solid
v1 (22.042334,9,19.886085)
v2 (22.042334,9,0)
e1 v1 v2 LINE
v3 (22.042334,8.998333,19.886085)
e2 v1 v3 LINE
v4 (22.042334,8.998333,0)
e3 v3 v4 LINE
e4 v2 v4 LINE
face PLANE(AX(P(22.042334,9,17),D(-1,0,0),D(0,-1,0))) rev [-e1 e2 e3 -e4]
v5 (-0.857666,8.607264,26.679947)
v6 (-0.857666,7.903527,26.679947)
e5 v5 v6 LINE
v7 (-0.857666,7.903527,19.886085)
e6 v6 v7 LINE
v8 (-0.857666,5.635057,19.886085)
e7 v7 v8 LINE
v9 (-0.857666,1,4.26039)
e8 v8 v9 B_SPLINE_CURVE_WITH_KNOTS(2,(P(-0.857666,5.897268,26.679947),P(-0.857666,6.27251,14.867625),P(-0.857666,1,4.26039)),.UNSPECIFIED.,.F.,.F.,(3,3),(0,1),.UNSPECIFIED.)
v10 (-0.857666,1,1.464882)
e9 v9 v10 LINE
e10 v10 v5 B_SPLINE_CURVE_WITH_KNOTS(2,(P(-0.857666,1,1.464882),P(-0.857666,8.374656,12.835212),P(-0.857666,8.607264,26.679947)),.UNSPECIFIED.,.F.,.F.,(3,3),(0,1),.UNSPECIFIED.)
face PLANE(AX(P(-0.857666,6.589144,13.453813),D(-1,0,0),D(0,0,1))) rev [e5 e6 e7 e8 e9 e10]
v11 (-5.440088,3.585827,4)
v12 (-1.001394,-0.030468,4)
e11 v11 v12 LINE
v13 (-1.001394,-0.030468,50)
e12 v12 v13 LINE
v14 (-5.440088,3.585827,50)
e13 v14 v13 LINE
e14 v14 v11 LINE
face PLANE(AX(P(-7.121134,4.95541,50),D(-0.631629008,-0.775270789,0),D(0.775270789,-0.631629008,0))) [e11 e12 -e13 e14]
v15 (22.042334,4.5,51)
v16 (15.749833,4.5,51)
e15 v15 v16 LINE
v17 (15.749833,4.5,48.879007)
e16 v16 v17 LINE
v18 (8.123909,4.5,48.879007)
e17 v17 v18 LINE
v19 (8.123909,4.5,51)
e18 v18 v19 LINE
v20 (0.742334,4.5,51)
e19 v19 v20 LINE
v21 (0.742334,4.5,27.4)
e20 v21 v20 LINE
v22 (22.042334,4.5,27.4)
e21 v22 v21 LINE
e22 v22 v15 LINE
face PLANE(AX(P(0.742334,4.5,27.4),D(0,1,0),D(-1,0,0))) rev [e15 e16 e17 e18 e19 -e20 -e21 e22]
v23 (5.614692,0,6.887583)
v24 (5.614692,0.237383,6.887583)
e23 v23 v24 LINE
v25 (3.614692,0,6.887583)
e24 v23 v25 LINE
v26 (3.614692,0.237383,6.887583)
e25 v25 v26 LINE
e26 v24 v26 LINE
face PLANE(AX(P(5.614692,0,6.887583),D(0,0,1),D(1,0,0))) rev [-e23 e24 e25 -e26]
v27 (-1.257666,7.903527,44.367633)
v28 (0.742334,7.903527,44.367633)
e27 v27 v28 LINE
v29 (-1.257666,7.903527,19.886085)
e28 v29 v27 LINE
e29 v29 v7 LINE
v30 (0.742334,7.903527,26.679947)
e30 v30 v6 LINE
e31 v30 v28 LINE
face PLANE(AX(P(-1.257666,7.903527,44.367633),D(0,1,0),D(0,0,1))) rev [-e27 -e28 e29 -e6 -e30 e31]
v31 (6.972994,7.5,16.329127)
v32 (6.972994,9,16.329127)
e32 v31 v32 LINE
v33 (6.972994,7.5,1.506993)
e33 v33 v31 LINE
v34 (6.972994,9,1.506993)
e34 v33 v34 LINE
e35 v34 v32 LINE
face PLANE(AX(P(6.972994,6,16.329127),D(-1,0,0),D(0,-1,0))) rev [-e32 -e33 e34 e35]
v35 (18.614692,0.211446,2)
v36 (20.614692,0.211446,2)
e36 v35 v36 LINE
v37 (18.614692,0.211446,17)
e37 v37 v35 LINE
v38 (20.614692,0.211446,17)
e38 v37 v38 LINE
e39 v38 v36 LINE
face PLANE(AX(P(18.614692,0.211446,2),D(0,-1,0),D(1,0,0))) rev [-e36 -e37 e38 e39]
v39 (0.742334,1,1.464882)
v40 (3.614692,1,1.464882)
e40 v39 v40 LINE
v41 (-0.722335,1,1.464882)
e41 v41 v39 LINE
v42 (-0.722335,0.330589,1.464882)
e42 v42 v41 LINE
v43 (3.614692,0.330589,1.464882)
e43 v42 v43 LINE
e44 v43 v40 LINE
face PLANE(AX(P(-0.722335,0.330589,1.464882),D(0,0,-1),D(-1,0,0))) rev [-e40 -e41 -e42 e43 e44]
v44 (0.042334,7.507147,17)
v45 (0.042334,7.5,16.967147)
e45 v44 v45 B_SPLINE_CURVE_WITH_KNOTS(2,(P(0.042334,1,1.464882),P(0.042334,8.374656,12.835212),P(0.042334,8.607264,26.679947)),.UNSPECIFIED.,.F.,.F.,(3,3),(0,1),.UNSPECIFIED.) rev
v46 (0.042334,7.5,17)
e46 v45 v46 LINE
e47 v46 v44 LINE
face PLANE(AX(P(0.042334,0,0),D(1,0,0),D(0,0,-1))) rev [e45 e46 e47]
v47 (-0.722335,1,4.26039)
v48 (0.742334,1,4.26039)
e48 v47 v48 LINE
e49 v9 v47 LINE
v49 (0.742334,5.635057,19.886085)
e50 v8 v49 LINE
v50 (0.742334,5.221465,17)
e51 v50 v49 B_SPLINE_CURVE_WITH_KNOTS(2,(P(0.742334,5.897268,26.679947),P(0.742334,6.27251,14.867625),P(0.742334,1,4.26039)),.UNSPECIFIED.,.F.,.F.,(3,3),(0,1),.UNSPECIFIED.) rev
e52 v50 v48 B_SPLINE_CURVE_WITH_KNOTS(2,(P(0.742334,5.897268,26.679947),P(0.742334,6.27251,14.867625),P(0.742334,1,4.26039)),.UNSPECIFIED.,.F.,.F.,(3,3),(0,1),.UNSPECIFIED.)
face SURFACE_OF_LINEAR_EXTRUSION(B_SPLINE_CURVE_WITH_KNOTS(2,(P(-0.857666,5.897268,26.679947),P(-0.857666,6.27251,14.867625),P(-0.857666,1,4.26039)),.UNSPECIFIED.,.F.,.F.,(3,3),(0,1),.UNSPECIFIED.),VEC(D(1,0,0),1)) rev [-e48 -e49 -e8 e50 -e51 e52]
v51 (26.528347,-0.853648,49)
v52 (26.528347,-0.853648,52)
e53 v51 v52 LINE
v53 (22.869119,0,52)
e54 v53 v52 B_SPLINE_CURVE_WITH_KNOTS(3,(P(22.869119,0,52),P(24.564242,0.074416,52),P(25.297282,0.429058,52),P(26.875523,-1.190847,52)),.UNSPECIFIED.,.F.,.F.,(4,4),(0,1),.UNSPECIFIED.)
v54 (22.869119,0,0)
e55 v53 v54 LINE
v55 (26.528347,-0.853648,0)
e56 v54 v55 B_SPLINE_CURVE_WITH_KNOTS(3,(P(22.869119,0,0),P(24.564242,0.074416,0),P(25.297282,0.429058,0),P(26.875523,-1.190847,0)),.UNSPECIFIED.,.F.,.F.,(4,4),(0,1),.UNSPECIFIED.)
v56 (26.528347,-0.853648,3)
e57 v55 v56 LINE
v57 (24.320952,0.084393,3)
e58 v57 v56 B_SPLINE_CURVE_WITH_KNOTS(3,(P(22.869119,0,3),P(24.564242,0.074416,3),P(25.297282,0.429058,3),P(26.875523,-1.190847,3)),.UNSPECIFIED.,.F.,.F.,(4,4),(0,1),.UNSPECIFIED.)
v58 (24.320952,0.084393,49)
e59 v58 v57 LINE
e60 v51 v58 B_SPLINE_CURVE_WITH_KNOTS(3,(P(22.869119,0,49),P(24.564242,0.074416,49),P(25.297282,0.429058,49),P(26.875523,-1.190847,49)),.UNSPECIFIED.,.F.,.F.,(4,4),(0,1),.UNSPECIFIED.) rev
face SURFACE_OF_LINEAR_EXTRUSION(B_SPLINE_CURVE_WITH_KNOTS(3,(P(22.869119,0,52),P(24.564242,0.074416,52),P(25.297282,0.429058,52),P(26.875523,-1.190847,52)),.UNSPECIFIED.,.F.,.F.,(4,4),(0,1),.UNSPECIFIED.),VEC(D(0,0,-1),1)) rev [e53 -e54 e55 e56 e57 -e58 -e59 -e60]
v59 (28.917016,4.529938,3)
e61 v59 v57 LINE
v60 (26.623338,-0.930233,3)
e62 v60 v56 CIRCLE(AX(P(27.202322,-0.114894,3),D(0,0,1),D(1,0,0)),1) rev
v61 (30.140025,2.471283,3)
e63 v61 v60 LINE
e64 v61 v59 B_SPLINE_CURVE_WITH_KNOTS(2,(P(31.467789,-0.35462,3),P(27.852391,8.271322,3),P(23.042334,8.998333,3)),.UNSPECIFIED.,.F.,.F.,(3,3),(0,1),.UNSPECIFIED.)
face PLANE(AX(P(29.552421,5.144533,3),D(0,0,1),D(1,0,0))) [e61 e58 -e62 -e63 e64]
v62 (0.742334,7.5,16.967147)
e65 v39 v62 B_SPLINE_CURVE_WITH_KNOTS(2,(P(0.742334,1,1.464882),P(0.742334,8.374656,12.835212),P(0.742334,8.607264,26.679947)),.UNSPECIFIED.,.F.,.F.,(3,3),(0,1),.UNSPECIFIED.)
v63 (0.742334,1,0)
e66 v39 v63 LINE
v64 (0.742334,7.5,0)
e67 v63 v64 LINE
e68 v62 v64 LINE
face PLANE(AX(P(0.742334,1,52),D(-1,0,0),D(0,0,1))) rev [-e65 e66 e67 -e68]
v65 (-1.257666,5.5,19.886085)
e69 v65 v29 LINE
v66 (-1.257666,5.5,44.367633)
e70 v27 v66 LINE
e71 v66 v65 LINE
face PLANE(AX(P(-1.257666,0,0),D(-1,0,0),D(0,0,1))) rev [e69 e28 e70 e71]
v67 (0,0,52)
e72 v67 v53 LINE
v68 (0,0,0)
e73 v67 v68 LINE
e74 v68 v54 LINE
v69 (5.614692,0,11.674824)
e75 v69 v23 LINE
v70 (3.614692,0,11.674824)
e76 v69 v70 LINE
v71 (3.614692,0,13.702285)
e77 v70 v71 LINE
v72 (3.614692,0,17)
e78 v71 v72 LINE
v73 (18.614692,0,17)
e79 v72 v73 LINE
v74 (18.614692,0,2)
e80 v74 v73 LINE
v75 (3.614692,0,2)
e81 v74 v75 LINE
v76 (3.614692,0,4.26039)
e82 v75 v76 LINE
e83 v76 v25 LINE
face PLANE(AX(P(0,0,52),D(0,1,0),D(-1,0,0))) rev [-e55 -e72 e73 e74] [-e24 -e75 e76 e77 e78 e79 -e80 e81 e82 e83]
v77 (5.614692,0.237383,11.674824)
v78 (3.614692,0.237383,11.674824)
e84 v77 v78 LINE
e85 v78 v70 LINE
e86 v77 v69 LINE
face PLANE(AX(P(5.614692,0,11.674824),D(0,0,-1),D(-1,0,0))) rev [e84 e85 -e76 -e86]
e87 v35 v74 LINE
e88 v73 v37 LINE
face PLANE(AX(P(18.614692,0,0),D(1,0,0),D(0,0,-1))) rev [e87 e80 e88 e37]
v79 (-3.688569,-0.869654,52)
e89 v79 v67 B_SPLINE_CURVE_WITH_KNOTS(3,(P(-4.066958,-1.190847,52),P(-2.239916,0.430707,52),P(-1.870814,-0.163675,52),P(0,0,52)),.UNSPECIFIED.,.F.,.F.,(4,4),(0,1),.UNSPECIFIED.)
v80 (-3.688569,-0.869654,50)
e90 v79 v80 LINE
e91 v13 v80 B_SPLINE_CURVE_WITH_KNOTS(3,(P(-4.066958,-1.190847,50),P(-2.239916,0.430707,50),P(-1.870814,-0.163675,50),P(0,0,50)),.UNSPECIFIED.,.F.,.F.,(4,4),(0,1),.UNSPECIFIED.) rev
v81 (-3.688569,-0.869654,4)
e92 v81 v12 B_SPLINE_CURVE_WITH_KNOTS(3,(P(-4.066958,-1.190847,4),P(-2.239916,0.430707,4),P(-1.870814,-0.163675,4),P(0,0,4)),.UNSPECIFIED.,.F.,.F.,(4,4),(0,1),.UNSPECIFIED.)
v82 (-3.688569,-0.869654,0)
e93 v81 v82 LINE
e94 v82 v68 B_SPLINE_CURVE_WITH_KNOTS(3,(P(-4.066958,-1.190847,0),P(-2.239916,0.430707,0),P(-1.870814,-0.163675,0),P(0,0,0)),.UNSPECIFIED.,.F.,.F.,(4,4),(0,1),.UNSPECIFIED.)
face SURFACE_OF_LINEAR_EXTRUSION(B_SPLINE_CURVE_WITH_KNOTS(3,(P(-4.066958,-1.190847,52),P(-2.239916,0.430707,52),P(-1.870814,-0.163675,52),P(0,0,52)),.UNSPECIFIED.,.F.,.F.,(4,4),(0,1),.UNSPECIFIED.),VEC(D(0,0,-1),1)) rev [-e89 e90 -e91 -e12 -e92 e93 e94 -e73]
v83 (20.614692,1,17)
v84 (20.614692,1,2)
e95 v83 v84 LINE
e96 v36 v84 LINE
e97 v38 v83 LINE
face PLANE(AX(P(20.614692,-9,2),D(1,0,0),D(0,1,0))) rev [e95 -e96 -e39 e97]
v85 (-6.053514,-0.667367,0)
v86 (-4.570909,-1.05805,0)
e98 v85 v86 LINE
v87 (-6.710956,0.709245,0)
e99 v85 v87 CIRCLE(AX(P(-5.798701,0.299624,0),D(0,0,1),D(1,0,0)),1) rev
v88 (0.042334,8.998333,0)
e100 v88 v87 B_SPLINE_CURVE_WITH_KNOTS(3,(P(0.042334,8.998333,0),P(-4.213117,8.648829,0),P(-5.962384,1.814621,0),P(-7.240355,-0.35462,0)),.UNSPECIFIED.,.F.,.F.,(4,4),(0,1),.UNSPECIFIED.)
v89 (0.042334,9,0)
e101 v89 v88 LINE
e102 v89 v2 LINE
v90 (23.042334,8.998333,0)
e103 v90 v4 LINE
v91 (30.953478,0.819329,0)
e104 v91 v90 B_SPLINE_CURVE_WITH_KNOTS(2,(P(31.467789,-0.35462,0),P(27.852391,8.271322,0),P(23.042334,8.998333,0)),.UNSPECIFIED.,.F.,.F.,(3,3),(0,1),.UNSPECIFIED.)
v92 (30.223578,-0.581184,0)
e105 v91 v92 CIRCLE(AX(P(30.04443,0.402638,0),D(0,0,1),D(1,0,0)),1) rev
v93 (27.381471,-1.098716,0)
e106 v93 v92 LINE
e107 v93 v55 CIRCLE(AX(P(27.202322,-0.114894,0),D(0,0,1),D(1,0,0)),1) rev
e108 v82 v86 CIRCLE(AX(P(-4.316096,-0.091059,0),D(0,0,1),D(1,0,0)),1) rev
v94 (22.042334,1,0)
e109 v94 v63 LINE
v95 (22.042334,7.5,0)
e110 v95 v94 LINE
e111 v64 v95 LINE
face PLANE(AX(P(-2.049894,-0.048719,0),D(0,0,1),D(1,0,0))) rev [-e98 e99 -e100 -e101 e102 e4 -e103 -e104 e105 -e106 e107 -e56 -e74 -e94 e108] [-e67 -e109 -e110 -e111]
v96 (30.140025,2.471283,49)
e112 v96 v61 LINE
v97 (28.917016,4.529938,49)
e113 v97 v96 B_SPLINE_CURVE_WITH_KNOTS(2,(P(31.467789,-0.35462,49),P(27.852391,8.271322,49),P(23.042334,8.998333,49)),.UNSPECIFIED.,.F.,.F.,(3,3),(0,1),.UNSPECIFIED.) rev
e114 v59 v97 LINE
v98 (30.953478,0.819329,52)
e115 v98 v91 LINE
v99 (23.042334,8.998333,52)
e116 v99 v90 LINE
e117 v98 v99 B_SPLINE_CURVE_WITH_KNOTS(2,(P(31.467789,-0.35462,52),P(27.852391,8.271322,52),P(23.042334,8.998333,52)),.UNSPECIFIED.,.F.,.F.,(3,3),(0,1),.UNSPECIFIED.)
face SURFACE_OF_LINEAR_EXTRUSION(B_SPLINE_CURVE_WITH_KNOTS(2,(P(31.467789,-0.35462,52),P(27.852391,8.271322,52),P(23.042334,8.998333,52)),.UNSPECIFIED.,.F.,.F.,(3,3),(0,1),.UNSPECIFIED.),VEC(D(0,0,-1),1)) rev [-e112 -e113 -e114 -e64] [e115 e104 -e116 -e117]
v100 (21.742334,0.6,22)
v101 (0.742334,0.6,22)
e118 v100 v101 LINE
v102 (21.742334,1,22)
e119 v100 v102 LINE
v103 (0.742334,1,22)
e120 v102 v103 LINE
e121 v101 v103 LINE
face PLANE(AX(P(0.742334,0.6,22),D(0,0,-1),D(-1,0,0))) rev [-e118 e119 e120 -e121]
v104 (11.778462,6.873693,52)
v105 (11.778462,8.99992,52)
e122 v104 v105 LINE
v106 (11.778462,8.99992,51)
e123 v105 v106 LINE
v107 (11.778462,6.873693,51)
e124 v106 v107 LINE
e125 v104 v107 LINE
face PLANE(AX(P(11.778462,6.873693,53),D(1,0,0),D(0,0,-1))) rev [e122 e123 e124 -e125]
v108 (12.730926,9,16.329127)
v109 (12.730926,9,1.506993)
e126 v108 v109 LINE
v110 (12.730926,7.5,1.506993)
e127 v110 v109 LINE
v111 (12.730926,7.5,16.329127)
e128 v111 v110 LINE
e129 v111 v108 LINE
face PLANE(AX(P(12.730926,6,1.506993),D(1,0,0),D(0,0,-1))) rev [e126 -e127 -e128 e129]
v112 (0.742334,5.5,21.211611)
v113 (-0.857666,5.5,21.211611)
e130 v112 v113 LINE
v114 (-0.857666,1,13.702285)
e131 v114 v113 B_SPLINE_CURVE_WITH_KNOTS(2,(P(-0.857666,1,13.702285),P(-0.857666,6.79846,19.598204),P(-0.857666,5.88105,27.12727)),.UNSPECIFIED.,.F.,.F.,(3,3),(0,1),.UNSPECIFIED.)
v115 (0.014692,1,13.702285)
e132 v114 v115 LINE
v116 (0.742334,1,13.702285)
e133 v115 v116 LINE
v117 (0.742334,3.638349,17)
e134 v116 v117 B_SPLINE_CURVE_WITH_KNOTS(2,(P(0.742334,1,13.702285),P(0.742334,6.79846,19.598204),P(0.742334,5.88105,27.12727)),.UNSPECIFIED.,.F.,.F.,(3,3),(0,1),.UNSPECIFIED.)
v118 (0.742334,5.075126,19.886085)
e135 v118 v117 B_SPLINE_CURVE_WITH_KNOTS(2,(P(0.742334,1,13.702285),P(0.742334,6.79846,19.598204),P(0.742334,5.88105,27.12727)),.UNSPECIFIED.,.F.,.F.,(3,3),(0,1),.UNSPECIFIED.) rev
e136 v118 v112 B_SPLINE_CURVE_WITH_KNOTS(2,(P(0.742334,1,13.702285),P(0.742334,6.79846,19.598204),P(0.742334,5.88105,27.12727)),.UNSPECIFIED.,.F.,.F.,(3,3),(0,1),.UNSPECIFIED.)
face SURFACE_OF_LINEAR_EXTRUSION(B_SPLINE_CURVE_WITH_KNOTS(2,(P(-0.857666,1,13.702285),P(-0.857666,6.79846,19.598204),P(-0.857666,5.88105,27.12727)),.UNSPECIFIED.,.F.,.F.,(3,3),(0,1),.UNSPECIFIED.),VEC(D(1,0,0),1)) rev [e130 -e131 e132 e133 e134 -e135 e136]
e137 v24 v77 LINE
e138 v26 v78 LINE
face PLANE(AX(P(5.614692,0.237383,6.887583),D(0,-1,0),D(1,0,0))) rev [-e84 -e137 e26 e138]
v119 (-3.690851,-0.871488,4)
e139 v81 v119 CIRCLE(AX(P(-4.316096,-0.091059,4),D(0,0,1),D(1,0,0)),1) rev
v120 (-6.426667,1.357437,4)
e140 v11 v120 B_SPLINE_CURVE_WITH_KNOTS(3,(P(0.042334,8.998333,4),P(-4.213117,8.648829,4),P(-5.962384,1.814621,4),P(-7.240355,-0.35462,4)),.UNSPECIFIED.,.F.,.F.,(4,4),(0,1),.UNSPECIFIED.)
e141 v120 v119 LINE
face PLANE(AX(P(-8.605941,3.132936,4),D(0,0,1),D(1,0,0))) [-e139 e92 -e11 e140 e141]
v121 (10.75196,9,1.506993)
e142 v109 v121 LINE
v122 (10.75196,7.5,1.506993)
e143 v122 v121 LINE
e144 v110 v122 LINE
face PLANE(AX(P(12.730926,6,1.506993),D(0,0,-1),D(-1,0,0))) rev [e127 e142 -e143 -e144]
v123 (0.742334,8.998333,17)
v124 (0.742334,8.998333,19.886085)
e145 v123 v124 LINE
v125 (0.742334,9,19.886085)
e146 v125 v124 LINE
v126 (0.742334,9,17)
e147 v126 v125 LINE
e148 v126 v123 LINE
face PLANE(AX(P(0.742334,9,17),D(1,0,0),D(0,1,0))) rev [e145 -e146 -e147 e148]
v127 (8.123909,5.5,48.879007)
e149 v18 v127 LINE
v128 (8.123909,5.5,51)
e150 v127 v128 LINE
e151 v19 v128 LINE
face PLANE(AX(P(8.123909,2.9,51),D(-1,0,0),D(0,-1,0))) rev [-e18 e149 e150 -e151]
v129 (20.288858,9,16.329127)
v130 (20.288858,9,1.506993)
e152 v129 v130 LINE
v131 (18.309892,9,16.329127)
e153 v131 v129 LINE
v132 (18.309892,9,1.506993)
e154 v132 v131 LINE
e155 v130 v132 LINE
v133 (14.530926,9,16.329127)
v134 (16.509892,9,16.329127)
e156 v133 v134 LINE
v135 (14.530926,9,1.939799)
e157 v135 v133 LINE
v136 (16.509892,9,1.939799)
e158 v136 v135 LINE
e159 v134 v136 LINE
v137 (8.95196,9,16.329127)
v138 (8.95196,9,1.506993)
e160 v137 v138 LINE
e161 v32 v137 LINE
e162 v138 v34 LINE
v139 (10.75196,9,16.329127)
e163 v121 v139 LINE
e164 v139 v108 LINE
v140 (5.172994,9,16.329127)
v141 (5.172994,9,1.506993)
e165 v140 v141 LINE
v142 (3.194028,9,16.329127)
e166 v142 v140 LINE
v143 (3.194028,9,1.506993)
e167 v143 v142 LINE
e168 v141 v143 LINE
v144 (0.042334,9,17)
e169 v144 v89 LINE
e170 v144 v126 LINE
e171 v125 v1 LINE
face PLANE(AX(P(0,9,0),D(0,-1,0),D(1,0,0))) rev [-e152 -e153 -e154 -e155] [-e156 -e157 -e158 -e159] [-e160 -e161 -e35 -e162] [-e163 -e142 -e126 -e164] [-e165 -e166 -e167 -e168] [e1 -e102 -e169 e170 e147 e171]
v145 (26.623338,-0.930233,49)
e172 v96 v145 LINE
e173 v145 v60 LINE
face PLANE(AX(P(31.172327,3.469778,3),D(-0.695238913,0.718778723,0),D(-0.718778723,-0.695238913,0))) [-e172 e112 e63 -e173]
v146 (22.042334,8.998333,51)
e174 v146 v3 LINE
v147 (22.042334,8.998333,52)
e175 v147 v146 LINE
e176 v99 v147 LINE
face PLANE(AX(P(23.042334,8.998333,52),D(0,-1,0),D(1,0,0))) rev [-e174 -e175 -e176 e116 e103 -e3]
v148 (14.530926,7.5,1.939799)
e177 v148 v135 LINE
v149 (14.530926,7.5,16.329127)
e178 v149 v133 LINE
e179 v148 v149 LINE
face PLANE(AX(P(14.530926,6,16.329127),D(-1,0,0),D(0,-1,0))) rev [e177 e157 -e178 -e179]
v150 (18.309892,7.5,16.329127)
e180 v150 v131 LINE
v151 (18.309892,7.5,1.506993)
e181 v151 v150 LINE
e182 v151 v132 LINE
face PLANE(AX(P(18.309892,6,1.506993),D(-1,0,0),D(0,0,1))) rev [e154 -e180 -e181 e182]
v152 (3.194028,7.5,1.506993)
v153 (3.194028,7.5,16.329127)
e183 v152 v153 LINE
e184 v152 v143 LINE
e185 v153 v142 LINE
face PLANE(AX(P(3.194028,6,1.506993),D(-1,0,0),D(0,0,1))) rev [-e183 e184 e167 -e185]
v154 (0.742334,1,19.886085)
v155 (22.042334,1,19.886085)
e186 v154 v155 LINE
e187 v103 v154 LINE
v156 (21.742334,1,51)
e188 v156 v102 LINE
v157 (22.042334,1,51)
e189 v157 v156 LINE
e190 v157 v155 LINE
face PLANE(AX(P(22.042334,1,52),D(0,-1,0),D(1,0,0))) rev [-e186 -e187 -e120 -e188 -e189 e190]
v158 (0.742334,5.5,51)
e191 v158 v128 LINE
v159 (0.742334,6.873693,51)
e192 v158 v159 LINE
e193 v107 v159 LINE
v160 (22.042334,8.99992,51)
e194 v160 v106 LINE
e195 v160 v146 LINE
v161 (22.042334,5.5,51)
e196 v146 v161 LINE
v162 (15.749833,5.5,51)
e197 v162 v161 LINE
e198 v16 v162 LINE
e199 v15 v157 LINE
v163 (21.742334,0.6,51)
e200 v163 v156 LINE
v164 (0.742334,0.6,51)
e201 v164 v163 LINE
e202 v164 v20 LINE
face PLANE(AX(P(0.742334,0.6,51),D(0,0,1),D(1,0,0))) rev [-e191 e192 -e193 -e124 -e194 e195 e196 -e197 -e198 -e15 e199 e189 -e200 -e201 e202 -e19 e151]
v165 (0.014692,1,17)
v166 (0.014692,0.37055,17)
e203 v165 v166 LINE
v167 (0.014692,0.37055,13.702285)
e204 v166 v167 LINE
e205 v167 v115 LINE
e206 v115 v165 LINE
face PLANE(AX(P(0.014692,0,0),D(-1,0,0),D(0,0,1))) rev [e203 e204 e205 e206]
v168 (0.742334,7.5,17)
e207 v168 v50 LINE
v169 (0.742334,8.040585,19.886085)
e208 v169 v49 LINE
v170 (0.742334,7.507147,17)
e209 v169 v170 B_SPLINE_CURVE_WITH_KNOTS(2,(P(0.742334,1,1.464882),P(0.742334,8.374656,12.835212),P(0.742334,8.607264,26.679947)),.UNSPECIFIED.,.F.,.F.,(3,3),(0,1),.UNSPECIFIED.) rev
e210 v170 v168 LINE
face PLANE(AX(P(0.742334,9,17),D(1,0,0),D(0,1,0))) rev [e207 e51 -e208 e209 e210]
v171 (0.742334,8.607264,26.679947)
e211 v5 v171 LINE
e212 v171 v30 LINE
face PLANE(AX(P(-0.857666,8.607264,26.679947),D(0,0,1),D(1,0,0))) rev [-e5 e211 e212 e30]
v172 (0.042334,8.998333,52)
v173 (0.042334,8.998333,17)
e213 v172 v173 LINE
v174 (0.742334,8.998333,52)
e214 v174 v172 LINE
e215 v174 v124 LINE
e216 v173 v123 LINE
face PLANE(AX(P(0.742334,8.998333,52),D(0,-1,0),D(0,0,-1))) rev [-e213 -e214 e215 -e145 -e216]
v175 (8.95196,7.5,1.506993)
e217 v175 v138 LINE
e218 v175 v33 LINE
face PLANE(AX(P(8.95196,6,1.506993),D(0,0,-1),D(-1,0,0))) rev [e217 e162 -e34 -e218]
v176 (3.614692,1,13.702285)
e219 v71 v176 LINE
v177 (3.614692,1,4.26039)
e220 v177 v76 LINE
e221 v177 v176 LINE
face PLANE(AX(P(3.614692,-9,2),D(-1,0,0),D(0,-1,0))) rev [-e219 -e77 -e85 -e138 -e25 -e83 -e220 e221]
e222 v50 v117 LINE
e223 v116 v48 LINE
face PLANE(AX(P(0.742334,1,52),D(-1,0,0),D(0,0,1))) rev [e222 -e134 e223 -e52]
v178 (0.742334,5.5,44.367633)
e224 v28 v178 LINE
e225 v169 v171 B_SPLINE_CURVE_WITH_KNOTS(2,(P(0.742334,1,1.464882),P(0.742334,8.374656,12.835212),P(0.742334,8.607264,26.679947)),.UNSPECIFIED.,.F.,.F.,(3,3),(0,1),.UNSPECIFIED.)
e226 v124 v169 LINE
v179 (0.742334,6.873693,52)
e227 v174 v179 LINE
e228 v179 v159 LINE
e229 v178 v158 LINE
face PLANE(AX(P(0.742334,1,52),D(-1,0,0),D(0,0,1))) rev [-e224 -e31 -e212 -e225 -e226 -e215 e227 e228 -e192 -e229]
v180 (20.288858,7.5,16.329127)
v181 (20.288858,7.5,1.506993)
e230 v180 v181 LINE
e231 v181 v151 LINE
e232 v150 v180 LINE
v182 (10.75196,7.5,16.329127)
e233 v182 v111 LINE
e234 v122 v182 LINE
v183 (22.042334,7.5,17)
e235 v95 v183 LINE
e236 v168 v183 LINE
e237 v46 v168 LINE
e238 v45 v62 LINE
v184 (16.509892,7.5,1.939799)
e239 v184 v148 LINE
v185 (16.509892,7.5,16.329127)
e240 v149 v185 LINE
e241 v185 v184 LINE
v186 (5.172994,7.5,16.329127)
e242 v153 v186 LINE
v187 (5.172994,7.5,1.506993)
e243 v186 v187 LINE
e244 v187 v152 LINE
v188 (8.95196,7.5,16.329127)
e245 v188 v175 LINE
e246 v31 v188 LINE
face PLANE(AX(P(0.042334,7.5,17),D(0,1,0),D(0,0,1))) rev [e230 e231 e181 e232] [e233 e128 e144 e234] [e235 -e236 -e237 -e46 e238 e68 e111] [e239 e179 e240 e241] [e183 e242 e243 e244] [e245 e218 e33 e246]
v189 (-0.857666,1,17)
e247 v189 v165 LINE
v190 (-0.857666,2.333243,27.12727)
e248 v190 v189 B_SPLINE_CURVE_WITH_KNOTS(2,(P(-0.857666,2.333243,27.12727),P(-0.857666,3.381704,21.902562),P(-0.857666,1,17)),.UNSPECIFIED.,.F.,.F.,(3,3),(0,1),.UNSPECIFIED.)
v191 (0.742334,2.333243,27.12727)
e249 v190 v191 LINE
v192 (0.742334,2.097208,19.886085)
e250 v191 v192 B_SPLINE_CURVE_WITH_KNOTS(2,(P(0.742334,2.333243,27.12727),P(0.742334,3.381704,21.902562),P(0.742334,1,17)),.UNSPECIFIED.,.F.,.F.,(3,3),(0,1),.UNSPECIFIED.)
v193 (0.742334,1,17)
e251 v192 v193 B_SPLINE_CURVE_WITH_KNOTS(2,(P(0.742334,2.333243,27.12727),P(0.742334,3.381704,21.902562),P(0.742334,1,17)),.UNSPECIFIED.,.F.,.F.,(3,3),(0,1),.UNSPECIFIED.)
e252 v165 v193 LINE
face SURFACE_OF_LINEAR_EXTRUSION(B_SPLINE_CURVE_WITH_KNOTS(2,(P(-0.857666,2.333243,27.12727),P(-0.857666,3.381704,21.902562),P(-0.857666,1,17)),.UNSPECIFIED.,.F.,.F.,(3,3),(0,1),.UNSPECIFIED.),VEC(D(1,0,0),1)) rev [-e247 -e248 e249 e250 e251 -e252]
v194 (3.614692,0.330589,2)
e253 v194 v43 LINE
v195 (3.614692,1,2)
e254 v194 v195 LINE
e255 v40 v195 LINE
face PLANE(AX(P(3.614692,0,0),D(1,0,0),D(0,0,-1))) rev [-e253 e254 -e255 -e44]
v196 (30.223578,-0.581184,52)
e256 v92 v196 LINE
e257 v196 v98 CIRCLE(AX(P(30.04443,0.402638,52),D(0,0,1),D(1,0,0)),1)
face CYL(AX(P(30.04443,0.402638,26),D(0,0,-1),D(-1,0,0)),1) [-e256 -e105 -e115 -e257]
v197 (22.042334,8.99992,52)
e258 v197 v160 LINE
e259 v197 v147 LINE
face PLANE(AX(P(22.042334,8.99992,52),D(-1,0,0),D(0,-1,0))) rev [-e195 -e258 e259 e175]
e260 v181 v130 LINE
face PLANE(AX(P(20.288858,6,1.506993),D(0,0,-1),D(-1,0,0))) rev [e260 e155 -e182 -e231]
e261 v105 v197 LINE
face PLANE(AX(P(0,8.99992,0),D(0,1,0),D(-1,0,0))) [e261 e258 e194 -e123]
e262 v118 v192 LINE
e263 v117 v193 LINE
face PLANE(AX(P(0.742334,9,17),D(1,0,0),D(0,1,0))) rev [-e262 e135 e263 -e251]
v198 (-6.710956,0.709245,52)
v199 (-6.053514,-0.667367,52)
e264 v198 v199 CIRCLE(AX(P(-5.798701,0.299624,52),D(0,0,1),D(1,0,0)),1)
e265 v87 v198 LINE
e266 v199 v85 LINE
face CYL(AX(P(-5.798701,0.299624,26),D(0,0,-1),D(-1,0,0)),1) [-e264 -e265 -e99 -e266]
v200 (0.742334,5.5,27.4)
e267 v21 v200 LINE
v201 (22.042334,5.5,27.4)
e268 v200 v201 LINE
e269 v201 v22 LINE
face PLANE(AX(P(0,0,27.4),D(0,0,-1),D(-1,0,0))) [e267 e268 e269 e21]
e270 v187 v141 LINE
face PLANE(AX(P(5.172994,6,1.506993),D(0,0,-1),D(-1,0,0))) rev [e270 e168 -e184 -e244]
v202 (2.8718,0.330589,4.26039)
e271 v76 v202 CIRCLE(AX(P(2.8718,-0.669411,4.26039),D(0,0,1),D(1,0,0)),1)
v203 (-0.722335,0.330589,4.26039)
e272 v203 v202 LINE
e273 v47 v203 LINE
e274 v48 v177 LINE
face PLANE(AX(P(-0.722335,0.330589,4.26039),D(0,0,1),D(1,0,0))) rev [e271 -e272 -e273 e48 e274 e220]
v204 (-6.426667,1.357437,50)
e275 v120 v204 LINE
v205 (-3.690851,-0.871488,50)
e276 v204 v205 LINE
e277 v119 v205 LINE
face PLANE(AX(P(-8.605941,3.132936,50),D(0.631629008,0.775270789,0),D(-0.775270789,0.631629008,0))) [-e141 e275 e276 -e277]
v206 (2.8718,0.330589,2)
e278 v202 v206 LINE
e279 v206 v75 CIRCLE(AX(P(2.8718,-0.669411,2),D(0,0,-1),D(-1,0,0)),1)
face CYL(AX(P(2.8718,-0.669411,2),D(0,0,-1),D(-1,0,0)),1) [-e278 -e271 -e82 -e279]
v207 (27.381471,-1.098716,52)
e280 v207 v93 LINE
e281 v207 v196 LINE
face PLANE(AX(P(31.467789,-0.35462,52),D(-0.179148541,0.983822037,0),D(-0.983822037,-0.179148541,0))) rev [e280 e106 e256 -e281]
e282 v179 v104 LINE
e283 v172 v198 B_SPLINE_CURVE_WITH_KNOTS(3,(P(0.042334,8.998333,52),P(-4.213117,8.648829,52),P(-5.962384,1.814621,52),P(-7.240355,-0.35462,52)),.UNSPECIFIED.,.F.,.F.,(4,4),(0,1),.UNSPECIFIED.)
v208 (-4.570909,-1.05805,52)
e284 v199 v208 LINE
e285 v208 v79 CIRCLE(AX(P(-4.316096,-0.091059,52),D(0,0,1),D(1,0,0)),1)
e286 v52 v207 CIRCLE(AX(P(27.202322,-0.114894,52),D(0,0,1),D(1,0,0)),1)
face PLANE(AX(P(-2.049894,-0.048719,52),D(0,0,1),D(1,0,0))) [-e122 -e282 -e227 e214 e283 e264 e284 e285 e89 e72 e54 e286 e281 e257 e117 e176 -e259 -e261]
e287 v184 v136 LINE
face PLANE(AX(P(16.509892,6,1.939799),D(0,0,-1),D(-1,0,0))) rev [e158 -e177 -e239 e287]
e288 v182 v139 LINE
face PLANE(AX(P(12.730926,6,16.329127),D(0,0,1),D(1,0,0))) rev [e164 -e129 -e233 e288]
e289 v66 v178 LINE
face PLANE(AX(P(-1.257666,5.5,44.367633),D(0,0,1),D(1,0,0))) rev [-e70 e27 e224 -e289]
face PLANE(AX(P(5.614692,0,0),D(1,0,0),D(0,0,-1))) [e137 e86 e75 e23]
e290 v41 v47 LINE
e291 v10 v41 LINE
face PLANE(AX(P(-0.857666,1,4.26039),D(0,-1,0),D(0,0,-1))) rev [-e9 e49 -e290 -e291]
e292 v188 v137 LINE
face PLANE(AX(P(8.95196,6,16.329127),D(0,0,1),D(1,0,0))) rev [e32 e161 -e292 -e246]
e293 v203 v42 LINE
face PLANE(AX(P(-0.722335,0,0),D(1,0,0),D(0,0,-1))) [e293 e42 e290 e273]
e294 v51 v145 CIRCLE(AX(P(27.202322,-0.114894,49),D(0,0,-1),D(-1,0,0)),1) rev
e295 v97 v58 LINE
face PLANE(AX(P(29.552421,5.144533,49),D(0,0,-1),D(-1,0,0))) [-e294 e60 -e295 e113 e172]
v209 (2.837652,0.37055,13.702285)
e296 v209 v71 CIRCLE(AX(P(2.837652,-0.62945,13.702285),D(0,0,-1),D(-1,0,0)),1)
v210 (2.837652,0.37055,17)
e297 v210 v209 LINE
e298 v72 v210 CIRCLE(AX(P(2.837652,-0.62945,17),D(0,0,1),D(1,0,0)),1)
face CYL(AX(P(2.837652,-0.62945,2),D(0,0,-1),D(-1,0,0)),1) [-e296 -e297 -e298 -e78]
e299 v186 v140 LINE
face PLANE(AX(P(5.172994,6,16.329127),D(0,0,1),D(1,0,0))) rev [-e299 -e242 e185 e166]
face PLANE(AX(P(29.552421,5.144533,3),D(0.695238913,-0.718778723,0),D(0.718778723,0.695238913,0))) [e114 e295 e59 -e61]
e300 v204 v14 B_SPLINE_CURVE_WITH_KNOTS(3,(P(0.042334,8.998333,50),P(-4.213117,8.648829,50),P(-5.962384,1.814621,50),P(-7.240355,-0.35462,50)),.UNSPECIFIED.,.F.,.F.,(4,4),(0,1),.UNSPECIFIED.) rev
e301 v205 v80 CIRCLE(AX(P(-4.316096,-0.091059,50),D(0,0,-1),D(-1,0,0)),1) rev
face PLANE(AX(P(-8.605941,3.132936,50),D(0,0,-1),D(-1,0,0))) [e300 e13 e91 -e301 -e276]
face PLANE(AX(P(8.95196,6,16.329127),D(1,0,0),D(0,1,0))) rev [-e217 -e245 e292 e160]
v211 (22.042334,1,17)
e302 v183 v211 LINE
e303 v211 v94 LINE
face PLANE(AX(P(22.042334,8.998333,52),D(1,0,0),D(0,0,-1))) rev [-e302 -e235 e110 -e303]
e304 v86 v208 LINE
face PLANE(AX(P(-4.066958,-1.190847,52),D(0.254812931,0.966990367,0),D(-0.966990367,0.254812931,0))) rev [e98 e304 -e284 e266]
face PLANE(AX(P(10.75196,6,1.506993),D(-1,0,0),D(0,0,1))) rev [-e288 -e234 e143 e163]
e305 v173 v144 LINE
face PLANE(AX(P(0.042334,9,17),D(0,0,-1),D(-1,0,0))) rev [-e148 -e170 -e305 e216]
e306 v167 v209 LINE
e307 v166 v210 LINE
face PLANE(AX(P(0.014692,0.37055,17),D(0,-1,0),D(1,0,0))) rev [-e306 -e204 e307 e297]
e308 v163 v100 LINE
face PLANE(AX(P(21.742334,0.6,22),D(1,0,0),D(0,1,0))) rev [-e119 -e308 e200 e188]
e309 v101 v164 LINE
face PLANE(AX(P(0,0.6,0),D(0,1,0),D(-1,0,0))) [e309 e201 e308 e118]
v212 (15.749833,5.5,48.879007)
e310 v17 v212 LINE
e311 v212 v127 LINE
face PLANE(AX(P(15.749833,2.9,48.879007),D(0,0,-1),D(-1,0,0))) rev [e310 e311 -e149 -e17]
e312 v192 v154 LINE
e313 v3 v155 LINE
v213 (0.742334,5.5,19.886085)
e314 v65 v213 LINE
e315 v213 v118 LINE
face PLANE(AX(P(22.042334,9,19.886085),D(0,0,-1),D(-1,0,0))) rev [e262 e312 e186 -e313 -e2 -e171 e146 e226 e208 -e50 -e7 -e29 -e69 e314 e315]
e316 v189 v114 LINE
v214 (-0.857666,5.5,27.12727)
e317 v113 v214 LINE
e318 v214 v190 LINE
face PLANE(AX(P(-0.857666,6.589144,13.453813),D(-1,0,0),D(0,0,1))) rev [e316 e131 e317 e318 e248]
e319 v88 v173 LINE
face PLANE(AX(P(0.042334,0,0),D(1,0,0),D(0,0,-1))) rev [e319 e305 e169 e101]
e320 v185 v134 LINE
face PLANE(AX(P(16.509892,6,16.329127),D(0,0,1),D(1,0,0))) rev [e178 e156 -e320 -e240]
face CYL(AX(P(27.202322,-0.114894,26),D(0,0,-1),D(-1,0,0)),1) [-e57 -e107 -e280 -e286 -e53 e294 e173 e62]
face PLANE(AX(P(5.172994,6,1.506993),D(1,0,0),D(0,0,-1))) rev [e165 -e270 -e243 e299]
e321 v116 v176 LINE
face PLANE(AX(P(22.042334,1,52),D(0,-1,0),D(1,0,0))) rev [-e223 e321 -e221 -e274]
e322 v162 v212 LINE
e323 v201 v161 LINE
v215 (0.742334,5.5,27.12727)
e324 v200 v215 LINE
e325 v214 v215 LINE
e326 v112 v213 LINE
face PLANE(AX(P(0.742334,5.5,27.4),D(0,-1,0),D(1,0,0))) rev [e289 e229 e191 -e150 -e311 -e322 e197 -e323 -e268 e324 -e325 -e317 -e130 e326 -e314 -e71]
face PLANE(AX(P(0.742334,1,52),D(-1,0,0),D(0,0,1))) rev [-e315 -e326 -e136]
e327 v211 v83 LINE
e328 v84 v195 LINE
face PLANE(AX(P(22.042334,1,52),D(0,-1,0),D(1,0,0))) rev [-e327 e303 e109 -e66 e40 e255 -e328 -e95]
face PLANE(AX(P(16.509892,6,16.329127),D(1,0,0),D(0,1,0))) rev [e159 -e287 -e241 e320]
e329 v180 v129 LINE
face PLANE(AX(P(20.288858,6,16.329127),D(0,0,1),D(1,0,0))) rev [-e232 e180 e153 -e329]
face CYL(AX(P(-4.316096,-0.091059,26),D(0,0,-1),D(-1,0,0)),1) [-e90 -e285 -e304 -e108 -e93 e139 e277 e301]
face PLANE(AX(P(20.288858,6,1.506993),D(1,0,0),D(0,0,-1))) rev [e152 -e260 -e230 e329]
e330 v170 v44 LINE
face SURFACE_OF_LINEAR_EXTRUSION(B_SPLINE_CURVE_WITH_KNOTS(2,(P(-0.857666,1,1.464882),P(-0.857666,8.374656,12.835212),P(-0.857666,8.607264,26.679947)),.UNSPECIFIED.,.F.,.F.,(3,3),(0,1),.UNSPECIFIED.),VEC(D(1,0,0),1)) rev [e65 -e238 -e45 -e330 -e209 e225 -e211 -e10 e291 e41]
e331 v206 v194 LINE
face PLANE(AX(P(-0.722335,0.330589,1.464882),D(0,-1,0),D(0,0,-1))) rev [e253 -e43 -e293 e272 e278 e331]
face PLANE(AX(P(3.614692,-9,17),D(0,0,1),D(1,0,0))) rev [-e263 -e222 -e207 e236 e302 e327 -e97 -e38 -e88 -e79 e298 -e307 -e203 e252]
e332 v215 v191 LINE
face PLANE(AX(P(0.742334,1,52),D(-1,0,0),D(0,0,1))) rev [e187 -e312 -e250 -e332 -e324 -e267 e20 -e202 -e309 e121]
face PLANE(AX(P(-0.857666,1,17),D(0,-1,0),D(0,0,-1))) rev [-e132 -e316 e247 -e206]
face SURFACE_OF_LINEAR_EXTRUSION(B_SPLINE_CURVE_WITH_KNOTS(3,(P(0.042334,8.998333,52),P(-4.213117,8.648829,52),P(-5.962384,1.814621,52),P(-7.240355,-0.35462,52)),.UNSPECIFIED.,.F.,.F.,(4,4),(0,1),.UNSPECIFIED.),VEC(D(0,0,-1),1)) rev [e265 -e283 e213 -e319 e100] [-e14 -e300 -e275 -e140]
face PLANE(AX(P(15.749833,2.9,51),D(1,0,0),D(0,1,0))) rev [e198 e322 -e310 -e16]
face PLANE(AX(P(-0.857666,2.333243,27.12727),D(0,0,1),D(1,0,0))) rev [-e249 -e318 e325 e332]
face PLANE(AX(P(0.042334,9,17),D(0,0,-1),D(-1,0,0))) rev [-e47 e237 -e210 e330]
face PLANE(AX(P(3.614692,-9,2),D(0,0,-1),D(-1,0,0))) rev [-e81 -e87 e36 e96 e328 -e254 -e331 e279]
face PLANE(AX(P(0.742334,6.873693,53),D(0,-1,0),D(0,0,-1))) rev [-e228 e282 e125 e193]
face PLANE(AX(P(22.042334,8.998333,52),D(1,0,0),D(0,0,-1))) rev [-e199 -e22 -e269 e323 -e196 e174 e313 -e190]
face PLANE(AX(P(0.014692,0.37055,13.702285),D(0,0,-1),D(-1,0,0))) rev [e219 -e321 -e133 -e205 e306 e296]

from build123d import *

# Parameters (mm, degrees)
BOSS_EXTRUDE2_DEPTH      = 52
FILLET2_R                = 1
CUT_EXTRUDE2_DEPTH       = 3
CUT_EXTRUDE2_DEPTH_BACK  = 6
SKETCH10_W               = 2.350757351
SKETCH10_H               = 46
SKETCH11_W               = 17
SKETCH11_H               = 15
PELTIER_DEPTH            = 10
SKETCH12_W               = 21
SKETCH12_H               = 29
BATTERY_DEPTH            = 0.4
SKETCH14_W               = 21.3
SKETCH14_H               = 1
BOSS_EXTRUDE4_DEPTH      = 7.999920354
SKETCH15_W               = 3.297714658
SKETCH15_H               = 0.629450307
CUT_EXTRUDE5_DEPTH       = 3.6
SKETCH16_W               = 2.795507754
SKETCH16_H               = 0.669410668
CUT_EXTRUDE6_DEPTH       = 4.337027413
FILLET3_R                = 1
CUT_EXTRUDE7_DEPTH       = 1.6
CUT_EXTRUDE8_DEPTH       = 1.6
FILLET4_R                = 1
FILLET5_R                = 1
SKETCH19_W               = 21.3
SKETCH19_H               = 1
BOSS_EXTRUDE5_DEPTH      = 23.6
SKETCH20_W               = 7.625924169
SKETCH20_H               = 2.120993271
CUT_EXTRUDE9_DEPTH       = 2.6
SKETCH21_W               = 21.3
SKETCH21_H               = 2.886084762
BOSS_EXTRUDE6_DEPTH      = 8
SKETCH22_W               = 17
SKETCH22_H               = 1.5
BOSS_EXTRUDE7_DEPTH      = 22
SKETCH23_W               = 24.481547991
SKETCH23_H               = 2.403526745
CUT_EXTRUDE10_DEPTH      = 2
SKETCH24_W               = 15
SKETCH24_H               = 0.211445756
BOSS_EXTRUDE8_DEPTH      = 2
SKETCH25_W               = 4.787241237
SKETCH25_H               = 0.237383131
BOSS_EXTRUDE9_DEPTH      = 2
SKETCH26_W               = 11.036128308
SKETCH26_H               = 2.126226966
CUT_EXTRUDE11_DEPTH      = 2
CUT_EXTRUDE12_DEPTH      = 2
CUT_EXTRUDE12_DEPTH_BACK = 11
SKETCH27_W               = 46
SKETCH27_H               = 2.33
SKETCH28_W               = 1.978966
SKETCH28_H               = 14.822133623
SKETCH28_H_2             = 14.389327905
SKETCH28_W_2             = 1.978965999
CUT_EXTRUDE13_DEPTH      = 3


with BuildPart() as part:
    # Sketch1 → Boss-Extrude2 (new body)
    with BuildSketch(Plane.XY):
        with BuildLine():
            Line((-4.066957942, -1.190846618), (-7.240355005, -0.354620493))
            add(Edge.make_bspline(
                [(0.042333709, 8.998333002), (-4.213116867, 8.648828695), (-5.962383558, 1.81462105), (-7.240355005, -0.354620493)],
                knots=[0, 0, 0, 0, 1, 1, 1, 1], degree=3))
            Line((0.042333709, 8.998333002), (0.742333709, 8.998333002))
            Line((0.742333709, 8.998333002), (0.742333709, 1))
            Line((0.742333709, 1), (22.042333709, 1))
            Line((22.042333709, 1), (22.042333709, 8.998333002))
            Line((22.042333709, 8.998333002), (23.042333709, 8.998333002))
            add(Edge.make_bspline(
                [(23.042333709, 8.998333002), (27.852391375, 8.27132168), (31.467788923, -0.354620493)],
                knots=[0, 0, 0, 1, 1, 1], degree=2))
            Line((31.467788923, -0.354620493), (26.875523276, -1.190846618))
            add(Edge.make_bspline(
                [(22.86911945, 0), (24.564241842, 0.074416087), (25.297281614, 0.429058332), (26.875523276, -1.190846618)],
                knots=[0, 0, 0, 0, 1, 1, 1, 1], degree=3))
            Line((22.86911945, 0), (0, 0))
            add(Edge.make_bspline(
                [(0, 0), (-1.870814346, -0.163675047), (-2.239916233, 0.430706612), (-4.066957942, -1.190846618)],
                knots=[0, 0, 0, 0, 1, 1, 1, 1], degree=3))
        make_face()
    extrude(amount=BOSS_EXTRUDE2_DEPTH)

    # Fillet2
    fillet2_edges = [part.edges().sort_by_distance(p)[0] for p in [
        (-4.066957942, -1.190846618, 26),
        (-7.240355005, -0.354620493, 26),
    ]]
    fillet(fillet2_edges, radius=FILLET2_R)

    # Sketch10 → Cut-Extrude2 (cut, two sides: drawn at the far end of the back side and taken through both)
    with BuildSketch(Plane(origin=(-4.380890916, 3.569201652, 0), x_dir=(0.6316290075695021, 0.7752707893354205, 0), z_dir=(-0.7752707893354205, 0.6316290075695021, 0)).offset(-CUT_EXTRUDE2_DEPTH_BACK)):
        with Locations((-1.831509184, -27)):
            Rectangle(SKETCH10_W, SKETCH10_H)
    extrude(amount=CUT_EXTRUDE2_DEPTH + CUT_EXTRUDE2_DEPTH_BACK, mode=Mode.SUBTRACT)

    # Sketch11 → Peltier (cut)
    with BuildSketch(Plane(origin=(0, 1, 0), x_dir=(1, 0, 0), z_dir=(0, 1, 0))):
        with Locations((12.114692368, -9.5)):
            Rectangle(SKETCH11_W, SKETCH11_H)
    extrude(amount=-PELTIER_DEPTH, mode=Mode.SUBTRACT)

    # Sketch12 → Battery (cut)
    with BuildSketch(Plane(origin=(0, 1, 0), x_dir=(1, 0, 0), z_dir=(0, 1, 0))):
        with Locations((11.242333709, -36.5)):
            Rectangle(SKETCH12_W, SKETCH12_H)
    extrude(amount=-BATTERY_DEPTH, mode=Mode.SUBTRACT)

    # Sketch14 → Boss-Extrude4 (add)
    with BuildSketch(Plane(origin=(0, 1, 0), x_dir=(1, 0, 0), z_dir=(0, 1, 0))):
        with Locations((11.392333709, -51.5)):
            Rectangle(SKETCH14_W, SKETCH14_H)
    extrude(amount=BOSS_EXTRUDE4_DEPTH)

    # Sketch15 → Cut-Extrude5 (cut)
    with BuildSketch(Plane(origin=(3.614692368, 0, 0), x_dir=(0, 0, -1), z_dir=(1, 0, 0))):
        with Locations((-15.351142671, 0.685274847)):
            Rectangle(SKETCH15_W, SKETCH15_H)
    extrude(amount=-CUT_EXTRUDE5_DEPTH, mode=Mode.SUBTRACT)

    # Sketch16 → Cut-Extrude6 (cut)
    with BuildSketch(Plane(origin=(3.614692368, 0, 0), x_dir=(0, 0, -1), z_dir=(1, 0, 0))):
        with Locations((-2.862635658, 0.665294666)):
            Rectangle(SKETCH16_W, SKETCH16_H)
    extrude(amount=-CUT_EXTRUDE6_DEPTH, mode=Mode.SUBTRACT)

    # Fillet3
    # the kernel refuses this fillet: 1 mm, written as the material it takes off along each edge
    with BuildSketch(Plane(origin=(3.614692368, 0.330589332, 2), x_dir=(0, -1, 0), z_dir=(0, 0, 1))) as fillet3_piece_1:
        with BuildLine():
            CenterArc((1, -0.742892561), FILLET3_R, 132.021596152, 47.978403848)
            Line((0, -0.742892561), (0, 0))
            Line((0, 0), (0.330589332, 0))
        make_face()
    extrude(amount=2.260389535, mode=Mode.SUBTRACT)
    with BuildSketch(Plane(origin=(3.614692368, 0.370549693, 17), x_dir=(0, -1, 0), z_dir=(0, 0, -1))) as fillet3_piece_2:
        with BuildLine():
            CenterArc((1, 0.77704074), FILLET3_R, 180, 50.990421184)
            Line((0, 0.77704074), (0, 0))
            Line((0, 0), (0.370549693, 0))
        make_face()
    extrude(amount=3.297714658, mode=Mode.SUBTRACT)

    # Sketch17 → Cut-Extrude7 (cut)
    with BuildSketch(Plane(origin=(0.742333709, 0, 0), x_dir=(0, 0, -1), z_dir=(1, 0, 0))):
        with BuildLine():
            Line((-26.679947222, 8.607264172), (-26.679947222, 5.897267678))
            add(Edge.make_bspline(
                [(-4.260389535, 1), (-14.867625221, 6.272509714), (-26.679947222, 5.897267678)],
                knots=[0, 0, 0, 1, 1, 1], degree=2))
            Line((-4.260389535, 1), (-1.464881781, 1))
            add(Edge.make_bspline(
                [(-1.464881781, 1), (-12.835212302, 8.374655541), (-26.679947222, 8.607264172)],
                knots=[0, 0, 0, 1, 1, 1], degree=2))
        make_face()
    extrude(amount=-CUT_EXTRUDE7_DEPTH, mode=Mode.SUBTRACT)

    # Sketch18 → Cut-Extrude8 (cut)
    with BuildSketch(Plane(origin=(0.742333709, 0, 0), x_dir=(0, 0, -1), z_dir=(1, 0, 0))):
        with BuildLine():
            Line((-27.127269804, 2.333242891), (-27.127269804, 5.881050361))
            add(Edge.make_bspline(
                [(-13.702285342, 1), (-19.59820355, 6.798459793), (-27.127269804, 5.881050361)],
                knots=[0, 0, 0, 1, 1, 1], degree=2))
            Line((-13.702285342, 1), (-17, 1))
            add(Edge.make_bspline(
                [(-17, 1), (-21.902562333, 3.381704282), (-27.127269804, 2.333242891)],
                knots=[0, 0, 0, 1, 1, 1], degree=2))
        make_face()
    extrude(amount=-CUT_EXTRUDE8_DEPTH, mode=Mode.SUBTRACT)

    # Fillet4
    fillet4_edges = [part.edges().sort_by_distance(p)[0] for p in [
        (26.875523276, -1.190846618, 26),
    ]]
    fillet(fillet4_edges, radius=FILLET4_R)

    # Fillet5
    fillet5_edges = [part.edges().sort_by_distance(p)[0] for p in [
        (31.467788923, -0.354620493, 26),
    ]]
    fillet(fillet5_edges, radius=FILLET5_R)

    # Sketch19 → Boss-Extrude5 (add)
    with BuildSketch(Plane(origin=(0, 0, 51), x_dir=(-1, 0, 0), z_dir=(0, 0, -1))):
        with Locations((-11.392333709, 5)):
            Rectangle(SKETCH19_W, SKETCH19_H)
    extrude(amount=BOSS_EXTRUDE5_DEPTH)

    # Sketch20 → Cut-Extrude9 (cut)
    with BuildSketch(Plane(origin=(0, 5.5, 0), x_dir=(1, 0, 0), z_dir=(0, 1, 0))):
        with Locations((11.936871332, -49.939503364)):
            Rectangle(SKETCH20_W, SKETCH20_H)
    extrude(amount=-CUT_EXTRUDE9_DEPTH, mode=Mode.SUBTRACT)

    # Sketch21 → Boss-Extrude6 (add)
    with BuildSketch(Plane(origin=(0, 1, 0), x_dir=(1, 0, 0), z_dir=(0, 1, 0))):
        with Locations((11.392333709, -18.443042381)):
            Rectangle(SKETCH21_W, SKETCH21_H)
    extrude(amount=BOSS_EXTRUDE6_DEPTH)

    # Sketch22 → Boss-Extrude7 (add)
    with BuildSketch(Plane.ZY.offset(-22.042333709)):
        with Locations((8.5, 8.25)):
            Rectangle(SKETCH22_W, SKETCH22_H)
    extrude(amount=BOSS_EXTRUDE7_DEPTH)

    # Sketch23 → Cut-Extrude10 (cut)
    with BuildSketch(Plane(origin=(0.742333709, 0, 0), x_dir=(0, 0, -1), z_dir=(1, 0, 0))):
        with Locations((-32.126858758, 6.701763373)):
            Rectangle(SKETCH23_W, SKETCH23_H)
    extrude(amount=-CUT_EXTRUDE10_DEPTH, mode=Mode.SUBTRACT)

    # Sketch24 → Boss-Extrude8 (add)
    with BuildSketch(Plane.ZY.offset(-20.614692368)):
        with Locations((9.5, 0.105722878)):
            Rectangle(SKETCH24_W, SKETCH24_H)
    extrude(amount=BOSS_EXTRUDE8_DEPTH)

    # Sketch25 → Boss-Extrude9 (add)
    with BuildSketch(Plane(origin=(3.614692368, 0, 0), x_dir=(0, 0, -1), z_dir=(1, 0, 0))):
        with Locations((-9.281203123, 0.118691566)):
            Rectangle(SKETCH25_W, SKETCH25_H)
    extrude(amount=BOSS_EXTRUDE9_DEPTH)

    # Sketch26 → Cut-Extrude11 (cut)
    with BuildSketch(Plane(origin=(0, 0, 51), x_dir=(-1, 0, 0), z_dir=(0, 0, -1))):
        with Locations((-6.260397863, 7.936806871)):
            Rectangle(SKETCH26_W, SKETCH26_H)
    extrude(amount=-CUT_EXTRUDE11_DEPTH, mode=Mode.SUBTRACT)

    # Sketch27 → Cut-Extrude12 (cut, two sides: drawn at the far end of the back side and taken through both)
    with BuildSketch(Plane(origin=(16.401330443, 15.864191281, 0), x_dir=(0, 0, -1), z_dir=(0.7187787233935903, 0.6952389134654942, 0)).offset(-CUT_EXTRUDE12_DEPTH_BACK)):
        with Locations((-26, -18.013212029)):
            Rectangle(SKETCH27_W, SKETCH27_H)
    extrude(amount=CUT_EXTRUDE12_DEPTH + CUT_EXTRUDE12_DEPTH_BACK, mode=Mode.SUBTRACT)

    # Sketch28 → Cut-Extrude13 (cut)
    with BuildSketch(Plane(origin=(0, 9, 0), x_dir=(1, 0, 0), z_dir=(0, 1, 0))):
        with Locations((19.299375066, -8.918059871)):
            Rectangle(SKETCH28_W, SKETCH28_H)
        with Locations((15.520409066, -9.13446273)):
            Rectangle(SKETCH28_W, SKETCH28_H_2)
        with Locations((11.741443067, -8.918059871)):
            Rectangle(SKETCH28_W_2, SKETCH28_H)
        with Locations((7.962477067, -8.918059871)):
            Rectangle(SKETCH28_W, SKETCH28_H)
        with Locations((4.183511067, -8.918059871)):
            Rectangle(SKETCH28_W, SKETCH28_H)
    extrude(amount=-CUT_EXTRUDE13_DEPTH, mode=Mode.SUBTRACT)


solid = part.part
